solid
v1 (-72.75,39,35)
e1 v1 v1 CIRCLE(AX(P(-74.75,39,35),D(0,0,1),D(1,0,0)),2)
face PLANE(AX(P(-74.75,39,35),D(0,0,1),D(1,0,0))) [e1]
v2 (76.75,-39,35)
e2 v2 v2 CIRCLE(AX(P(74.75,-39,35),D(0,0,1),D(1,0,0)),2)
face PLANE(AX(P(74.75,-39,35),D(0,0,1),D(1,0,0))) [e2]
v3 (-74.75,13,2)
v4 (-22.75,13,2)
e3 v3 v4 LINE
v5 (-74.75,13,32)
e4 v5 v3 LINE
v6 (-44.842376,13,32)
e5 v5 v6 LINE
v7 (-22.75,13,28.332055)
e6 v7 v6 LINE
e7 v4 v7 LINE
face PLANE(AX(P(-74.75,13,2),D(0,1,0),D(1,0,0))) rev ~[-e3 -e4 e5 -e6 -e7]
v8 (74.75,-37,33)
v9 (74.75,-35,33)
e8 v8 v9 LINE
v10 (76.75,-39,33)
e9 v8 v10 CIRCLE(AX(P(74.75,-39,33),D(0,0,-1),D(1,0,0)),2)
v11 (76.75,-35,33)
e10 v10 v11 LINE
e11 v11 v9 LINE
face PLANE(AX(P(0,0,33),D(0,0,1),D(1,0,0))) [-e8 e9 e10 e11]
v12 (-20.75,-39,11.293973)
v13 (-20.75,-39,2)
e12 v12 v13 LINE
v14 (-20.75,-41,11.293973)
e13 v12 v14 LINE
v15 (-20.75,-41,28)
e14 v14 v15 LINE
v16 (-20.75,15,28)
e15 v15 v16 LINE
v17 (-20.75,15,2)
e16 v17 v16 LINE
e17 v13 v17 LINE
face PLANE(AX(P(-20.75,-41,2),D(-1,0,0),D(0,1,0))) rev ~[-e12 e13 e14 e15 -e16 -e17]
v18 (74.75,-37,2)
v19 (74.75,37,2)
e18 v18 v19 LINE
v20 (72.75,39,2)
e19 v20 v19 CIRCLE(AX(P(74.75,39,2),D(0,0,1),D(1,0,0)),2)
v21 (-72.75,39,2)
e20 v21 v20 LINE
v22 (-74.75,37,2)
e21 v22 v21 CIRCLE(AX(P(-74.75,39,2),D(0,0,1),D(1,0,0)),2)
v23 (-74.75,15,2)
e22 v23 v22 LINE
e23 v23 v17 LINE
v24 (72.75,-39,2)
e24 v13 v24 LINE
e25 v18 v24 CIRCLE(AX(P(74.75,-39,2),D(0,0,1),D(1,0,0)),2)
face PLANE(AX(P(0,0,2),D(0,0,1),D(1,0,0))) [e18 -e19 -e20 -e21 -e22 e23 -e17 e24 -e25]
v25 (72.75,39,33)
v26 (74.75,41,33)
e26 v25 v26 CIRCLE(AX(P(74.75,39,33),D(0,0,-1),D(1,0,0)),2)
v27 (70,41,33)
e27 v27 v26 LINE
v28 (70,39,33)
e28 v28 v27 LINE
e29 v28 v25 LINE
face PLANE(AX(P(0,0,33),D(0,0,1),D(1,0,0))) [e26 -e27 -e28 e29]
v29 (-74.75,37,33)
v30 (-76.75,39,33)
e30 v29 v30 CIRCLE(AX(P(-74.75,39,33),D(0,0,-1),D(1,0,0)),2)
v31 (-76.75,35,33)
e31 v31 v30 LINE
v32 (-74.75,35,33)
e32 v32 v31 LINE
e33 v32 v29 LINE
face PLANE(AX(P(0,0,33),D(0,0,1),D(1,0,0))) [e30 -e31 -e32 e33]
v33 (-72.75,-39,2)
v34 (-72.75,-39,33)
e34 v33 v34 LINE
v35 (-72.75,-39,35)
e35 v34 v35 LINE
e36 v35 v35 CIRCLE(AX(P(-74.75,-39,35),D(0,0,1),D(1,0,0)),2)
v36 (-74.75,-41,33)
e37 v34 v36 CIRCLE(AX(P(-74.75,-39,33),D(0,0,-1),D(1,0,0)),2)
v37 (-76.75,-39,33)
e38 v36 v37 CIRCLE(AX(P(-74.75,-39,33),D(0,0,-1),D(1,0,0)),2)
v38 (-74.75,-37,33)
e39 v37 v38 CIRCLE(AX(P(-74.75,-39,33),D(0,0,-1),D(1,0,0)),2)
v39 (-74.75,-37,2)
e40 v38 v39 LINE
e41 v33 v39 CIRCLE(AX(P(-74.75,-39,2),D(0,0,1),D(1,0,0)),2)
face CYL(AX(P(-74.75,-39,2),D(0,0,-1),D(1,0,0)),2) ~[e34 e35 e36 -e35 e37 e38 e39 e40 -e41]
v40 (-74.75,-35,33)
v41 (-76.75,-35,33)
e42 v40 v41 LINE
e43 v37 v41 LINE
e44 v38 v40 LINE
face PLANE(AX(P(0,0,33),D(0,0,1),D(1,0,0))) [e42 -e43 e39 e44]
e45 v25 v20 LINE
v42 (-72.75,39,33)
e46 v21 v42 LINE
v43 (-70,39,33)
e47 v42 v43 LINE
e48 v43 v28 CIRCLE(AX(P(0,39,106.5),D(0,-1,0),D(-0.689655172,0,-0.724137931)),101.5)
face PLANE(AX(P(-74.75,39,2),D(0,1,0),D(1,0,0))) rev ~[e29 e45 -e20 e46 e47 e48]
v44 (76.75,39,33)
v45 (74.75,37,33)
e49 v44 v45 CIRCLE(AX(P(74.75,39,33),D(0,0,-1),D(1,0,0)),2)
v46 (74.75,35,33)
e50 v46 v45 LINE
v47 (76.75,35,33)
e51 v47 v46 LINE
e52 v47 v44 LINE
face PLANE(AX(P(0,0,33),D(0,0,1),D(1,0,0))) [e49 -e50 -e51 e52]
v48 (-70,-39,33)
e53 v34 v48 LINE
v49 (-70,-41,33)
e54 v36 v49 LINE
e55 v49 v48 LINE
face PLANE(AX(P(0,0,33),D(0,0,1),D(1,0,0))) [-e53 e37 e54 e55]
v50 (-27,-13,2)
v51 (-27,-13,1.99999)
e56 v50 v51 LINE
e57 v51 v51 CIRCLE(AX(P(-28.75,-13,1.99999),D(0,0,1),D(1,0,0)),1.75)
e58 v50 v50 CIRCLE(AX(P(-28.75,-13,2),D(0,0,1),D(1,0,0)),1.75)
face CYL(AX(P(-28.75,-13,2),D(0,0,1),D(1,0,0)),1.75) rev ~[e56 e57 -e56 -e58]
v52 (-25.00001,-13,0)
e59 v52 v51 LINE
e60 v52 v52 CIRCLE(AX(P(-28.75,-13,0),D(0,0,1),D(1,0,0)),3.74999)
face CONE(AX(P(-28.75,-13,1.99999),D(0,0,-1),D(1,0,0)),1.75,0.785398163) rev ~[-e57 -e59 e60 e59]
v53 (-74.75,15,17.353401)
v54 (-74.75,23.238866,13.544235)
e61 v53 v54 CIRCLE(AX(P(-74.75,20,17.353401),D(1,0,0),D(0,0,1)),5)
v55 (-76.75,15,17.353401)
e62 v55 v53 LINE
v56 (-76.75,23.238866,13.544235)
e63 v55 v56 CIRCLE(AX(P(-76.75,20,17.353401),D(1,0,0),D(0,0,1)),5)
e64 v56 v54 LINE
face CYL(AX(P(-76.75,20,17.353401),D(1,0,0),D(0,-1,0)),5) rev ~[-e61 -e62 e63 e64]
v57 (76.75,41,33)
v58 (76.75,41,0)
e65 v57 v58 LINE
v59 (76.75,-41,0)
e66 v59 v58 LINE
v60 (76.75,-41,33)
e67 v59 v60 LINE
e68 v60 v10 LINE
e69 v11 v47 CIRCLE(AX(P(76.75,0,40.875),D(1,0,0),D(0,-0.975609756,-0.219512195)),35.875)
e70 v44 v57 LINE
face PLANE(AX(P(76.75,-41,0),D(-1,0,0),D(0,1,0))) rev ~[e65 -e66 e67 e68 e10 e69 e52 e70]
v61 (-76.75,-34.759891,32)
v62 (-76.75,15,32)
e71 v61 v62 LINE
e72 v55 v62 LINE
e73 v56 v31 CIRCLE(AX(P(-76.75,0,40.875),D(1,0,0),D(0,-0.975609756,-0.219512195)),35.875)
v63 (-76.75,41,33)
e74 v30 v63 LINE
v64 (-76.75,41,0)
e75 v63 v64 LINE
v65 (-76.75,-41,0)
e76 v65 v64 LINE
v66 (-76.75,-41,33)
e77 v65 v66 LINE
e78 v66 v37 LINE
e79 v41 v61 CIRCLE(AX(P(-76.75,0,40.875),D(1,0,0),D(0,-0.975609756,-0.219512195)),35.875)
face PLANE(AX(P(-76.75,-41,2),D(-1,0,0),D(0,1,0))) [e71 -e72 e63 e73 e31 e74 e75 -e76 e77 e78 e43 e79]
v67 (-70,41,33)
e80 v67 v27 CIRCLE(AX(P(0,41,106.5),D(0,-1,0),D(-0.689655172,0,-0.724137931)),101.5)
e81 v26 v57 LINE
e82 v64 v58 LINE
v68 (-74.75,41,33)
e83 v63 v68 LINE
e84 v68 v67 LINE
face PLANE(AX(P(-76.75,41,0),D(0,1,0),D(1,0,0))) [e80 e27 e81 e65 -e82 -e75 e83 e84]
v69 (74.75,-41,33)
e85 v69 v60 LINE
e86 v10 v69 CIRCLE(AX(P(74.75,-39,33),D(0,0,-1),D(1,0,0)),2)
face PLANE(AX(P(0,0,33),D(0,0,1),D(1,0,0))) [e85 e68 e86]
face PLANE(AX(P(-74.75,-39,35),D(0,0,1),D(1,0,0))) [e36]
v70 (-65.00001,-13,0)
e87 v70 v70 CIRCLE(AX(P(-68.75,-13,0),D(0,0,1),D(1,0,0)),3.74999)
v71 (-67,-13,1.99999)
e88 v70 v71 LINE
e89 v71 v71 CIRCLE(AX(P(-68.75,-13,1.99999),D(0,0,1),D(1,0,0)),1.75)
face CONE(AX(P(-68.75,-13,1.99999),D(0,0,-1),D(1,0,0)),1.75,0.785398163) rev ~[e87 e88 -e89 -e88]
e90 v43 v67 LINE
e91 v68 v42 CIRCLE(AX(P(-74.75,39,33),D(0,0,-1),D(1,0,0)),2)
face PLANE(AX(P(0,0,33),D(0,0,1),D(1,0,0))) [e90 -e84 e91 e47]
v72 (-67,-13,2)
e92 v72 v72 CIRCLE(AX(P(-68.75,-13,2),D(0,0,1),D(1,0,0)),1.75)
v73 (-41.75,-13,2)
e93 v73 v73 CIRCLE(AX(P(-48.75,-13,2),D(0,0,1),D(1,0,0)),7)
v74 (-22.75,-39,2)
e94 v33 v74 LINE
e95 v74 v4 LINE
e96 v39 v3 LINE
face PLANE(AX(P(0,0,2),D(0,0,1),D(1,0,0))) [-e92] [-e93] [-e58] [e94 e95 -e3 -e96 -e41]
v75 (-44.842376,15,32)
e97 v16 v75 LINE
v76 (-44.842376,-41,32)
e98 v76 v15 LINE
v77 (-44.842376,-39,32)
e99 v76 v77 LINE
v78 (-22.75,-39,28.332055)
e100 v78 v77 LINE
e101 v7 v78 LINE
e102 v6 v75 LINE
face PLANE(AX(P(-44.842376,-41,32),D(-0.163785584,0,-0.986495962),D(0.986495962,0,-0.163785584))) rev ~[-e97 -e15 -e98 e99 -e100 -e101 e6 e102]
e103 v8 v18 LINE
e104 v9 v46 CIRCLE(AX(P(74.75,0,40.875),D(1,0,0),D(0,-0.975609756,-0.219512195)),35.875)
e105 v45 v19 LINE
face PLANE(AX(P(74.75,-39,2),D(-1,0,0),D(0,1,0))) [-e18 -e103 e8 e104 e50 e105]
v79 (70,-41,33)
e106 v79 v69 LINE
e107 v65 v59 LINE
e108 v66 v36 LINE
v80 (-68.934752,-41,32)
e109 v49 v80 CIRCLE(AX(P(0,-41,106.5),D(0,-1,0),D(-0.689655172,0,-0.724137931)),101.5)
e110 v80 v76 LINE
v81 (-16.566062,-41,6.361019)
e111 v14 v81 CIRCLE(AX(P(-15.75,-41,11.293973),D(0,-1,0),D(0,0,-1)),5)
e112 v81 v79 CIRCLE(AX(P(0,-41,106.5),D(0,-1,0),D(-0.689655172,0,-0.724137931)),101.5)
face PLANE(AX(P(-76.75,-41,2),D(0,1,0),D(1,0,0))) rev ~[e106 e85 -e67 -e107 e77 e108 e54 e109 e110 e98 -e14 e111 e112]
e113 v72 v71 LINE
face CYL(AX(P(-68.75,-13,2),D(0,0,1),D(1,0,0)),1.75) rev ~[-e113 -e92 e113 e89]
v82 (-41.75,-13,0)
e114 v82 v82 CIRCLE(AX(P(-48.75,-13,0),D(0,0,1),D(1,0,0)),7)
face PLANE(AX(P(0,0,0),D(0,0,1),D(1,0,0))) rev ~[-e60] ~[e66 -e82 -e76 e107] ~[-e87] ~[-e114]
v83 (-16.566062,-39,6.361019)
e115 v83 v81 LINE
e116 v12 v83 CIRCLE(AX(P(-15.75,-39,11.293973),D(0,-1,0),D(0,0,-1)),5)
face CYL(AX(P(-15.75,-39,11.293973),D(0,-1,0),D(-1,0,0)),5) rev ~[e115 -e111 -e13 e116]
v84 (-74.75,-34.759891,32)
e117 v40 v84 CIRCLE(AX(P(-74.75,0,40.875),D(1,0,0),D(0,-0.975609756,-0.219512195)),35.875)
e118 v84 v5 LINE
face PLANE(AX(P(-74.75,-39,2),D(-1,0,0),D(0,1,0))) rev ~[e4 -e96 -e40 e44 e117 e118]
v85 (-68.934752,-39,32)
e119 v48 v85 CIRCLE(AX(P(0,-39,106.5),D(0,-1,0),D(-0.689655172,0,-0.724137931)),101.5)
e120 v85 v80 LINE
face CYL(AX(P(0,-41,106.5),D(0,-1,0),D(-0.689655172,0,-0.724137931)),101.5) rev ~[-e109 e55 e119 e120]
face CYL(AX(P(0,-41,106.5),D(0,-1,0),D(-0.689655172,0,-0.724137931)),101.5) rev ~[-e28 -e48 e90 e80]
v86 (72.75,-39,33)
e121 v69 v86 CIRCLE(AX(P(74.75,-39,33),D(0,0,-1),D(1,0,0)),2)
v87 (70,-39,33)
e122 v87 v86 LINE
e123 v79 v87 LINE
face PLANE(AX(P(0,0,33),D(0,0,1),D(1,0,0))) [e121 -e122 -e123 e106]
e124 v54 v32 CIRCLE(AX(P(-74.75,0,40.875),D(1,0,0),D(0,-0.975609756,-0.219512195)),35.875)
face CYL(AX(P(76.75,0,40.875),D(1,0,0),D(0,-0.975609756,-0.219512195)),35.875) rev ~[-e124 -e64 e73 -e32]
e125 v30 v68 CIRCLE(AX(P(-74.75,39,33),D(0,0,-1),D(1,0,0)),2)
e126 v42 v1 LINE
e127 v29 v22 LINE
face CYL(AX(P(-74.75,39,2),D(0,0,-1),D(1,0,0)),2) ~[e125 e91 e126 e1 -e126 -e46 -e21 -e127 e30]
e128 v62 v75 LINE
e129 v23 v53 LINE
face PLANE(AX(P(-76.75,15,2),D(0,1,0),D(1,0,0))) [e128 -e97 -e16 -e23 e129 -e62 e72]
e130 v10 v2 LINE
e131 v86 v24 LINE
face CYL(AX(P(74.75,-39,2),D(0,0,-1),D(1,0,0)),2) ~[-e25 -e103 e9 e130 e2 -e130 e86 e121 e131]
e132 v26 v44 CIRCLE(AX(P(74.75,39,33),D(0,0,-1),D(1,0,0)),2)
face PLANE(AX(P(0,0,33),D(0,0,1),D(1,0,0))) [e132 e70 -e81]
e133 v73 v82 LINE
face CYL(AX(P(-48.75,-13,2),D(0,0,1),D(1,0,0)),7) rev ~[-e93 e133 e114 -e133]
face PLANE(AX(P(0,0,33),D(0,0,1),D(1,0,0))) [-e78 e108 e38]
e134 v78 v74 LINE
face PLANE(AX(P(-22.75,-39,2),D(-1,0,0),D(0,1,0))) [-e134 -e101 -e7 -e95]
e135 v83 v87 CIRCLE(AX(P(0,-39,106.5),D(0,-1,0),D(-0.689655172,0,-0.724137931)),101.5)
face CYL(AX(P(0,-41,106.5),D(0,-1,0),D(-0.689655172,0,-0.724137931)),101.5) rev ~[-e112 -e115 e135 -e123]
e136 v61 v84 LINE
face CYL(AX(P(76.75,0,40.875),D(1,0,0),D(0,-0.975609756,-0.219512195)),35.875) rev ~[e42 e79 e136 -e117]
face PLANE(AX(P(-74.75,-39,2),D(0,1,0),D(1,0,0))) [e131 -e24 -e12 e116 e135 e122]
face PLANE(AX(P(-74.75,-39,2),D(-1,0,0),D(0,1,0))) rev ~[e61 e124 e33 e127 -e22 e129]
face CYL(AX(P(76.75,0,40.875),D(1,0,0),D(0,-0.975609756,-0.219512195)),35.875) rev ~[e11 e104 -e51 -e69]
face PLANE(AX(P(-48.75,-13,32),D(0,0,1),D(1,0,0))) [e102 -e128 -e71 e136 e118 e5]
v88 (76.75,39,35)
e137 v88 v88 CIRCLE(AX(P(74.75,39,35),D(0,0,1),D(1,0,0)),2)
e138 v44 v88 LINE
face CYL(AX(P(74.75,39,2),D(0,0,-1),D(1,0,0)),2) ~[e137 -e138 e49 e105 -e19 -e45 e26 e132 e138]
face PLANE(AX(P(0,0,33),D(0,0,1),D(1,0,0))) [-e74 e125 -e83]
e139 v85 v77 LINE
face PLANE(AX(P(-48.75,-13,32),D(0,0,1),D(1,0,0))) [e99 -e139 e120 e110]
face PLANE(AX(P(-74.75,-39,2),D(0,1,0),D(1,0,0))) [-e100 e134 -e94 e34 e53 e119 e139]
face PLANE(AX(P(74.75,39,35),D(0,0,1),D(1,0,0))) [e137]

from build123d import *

# Parameters (mm, degrees)
F0_W      = 153.5
F0_H      = 82
F1_DEPTH  = 2
F2_R      = 7
F2_R_2    = 1.75
F3_DEPTH  = 2.001
F4_SIZE   = 1.99999
F5_R      = 2
F6_DEPTH  = 33
F7_W      = 153.5
F7_H      = 82
F7_W_2    = 149.5
F7_H_2    = 78
F8_DEPTH  = 31
F10_DEPTH = 82.001
F12_DEPTH = 153.501
F13_W     = 56
F13_H     = 56
F13_W_2   = 52
F13_H_2   = 52
F14_DEPTH = 30
F16_DEPTH = 82.001
F17_R     = 5


# Not quite as in the source:
# - a fillet or chamfer is up to 0.001 mm smaller than in the source, because OpenCascade refuses the exact size


with BuildPart() as f1:
    # F0 (on Top) → F1 (new body)
    with BuildSketch(Plane.XY):
        Rectangle(F0_W, F0_H)
    extrude(amount=F1_DEPTH)

    # F2 (on face) → F3 (cut, through all)
    with BuildSketch(Plane.XY.offset(2)):
        with Locations((-48.75, -13)):
            Circle(F2_R)
        with Locations((-68.75, -13)):
            Circle(F2_R_2)
        with Locations((-28.75, -13)):
            Circle(F2_R_2)
    extrude(amount=-F3_DEPTH, mode=Mode.SUBTRACT)

    # F4 (size 2 in the source; OpenCascade refuses exactly that, so slightly less here)
    f4_edges = [f1.edges().sort_by_distance(p)[0] for p in [
        (-70.5, -13, 0),
        (-30.5, -13, 0),
    ]]
    chamfer(f4_edges, length=F4_SIZE)

    # F5 (on face) → F6 (join)
    with BuildSketch(Plane.XY.offset(2)):
        with Locations((-74.75, 39)):
            Circle(F5_R)
        with Locations((74.75, 39)):
            Circle(F5_R)
        with Locations((-74.75, -39)):
            Circle(F5_R)
        with Locations((74.75, -39)):
            Circle(F5_R)
    extrude(amount=F6_DEPTH)

    # F7 (on face) → F8 (join)
    with BuildSketch(Plane.XY.offset(2)):
        Rectangle(F7_W, F7_H)
        Rectangle(F7_W_2, F7_H_2, mode=Mode.SUBTRACT)
    extrude(amount=F8_DEPTH)

    # F9 (on face) → F10 (cut, through all)
    with BuildSketch(Plane.XZ.offset(41)):
        with BuildLine():
            Line((70, 33), (-70, 33))
            ThreePointArc((-70, 33), (0, 5), (70, 33))
        make_face()
    extrude(amount=-F10_DEPTH, mode=Mode.SUBTRACT)

    # F11 (on face) → F12 (cut, through all)
    with BuildSketch(Plane.YZ.offset(76.75)):
        with BuildLine():
            Line((35, 33), (-35, 33))
            ThreePointArc((-35, 33), (0, 5), (35, 33))
        make_face()
    extrude(amount=-F12_DEPTH, mode=Mode.SUBTRACT)

    # F13 (on face) → F14 (join)
    with BuildSketch(Plane.XY.offset(2)):
        with Locations((-48.75, -13)):
            Rectangle(F13_W, F13_H)
        with Locations((-48.75, -13)):
            Rectangle(F13_W_2, F13_H_2, mode=Mode.SUBTRACT)
    extrude(amount=F14_DEPTH)

    # F15 (on face) → F16 (cut, through all)
    with BuildSketch(Plane.XZ.offset(41)):
        Polygon((-20.75, 28), (-20.75, 32), (-44.8423758792, 32), align=None)
    extrude(amount=-F16_DEPTH, mode=Mode.SUBTRACT)

    # F17
    f17_edges = [f1.edges().sort_by_distance(p)[0] for p in [
        (-20.75, -40, 7.143634),
        (-75.75, 15, 8.286419),
    ]]
    fillet(f17_edges, radius=F17_R)


solid = f1.part
